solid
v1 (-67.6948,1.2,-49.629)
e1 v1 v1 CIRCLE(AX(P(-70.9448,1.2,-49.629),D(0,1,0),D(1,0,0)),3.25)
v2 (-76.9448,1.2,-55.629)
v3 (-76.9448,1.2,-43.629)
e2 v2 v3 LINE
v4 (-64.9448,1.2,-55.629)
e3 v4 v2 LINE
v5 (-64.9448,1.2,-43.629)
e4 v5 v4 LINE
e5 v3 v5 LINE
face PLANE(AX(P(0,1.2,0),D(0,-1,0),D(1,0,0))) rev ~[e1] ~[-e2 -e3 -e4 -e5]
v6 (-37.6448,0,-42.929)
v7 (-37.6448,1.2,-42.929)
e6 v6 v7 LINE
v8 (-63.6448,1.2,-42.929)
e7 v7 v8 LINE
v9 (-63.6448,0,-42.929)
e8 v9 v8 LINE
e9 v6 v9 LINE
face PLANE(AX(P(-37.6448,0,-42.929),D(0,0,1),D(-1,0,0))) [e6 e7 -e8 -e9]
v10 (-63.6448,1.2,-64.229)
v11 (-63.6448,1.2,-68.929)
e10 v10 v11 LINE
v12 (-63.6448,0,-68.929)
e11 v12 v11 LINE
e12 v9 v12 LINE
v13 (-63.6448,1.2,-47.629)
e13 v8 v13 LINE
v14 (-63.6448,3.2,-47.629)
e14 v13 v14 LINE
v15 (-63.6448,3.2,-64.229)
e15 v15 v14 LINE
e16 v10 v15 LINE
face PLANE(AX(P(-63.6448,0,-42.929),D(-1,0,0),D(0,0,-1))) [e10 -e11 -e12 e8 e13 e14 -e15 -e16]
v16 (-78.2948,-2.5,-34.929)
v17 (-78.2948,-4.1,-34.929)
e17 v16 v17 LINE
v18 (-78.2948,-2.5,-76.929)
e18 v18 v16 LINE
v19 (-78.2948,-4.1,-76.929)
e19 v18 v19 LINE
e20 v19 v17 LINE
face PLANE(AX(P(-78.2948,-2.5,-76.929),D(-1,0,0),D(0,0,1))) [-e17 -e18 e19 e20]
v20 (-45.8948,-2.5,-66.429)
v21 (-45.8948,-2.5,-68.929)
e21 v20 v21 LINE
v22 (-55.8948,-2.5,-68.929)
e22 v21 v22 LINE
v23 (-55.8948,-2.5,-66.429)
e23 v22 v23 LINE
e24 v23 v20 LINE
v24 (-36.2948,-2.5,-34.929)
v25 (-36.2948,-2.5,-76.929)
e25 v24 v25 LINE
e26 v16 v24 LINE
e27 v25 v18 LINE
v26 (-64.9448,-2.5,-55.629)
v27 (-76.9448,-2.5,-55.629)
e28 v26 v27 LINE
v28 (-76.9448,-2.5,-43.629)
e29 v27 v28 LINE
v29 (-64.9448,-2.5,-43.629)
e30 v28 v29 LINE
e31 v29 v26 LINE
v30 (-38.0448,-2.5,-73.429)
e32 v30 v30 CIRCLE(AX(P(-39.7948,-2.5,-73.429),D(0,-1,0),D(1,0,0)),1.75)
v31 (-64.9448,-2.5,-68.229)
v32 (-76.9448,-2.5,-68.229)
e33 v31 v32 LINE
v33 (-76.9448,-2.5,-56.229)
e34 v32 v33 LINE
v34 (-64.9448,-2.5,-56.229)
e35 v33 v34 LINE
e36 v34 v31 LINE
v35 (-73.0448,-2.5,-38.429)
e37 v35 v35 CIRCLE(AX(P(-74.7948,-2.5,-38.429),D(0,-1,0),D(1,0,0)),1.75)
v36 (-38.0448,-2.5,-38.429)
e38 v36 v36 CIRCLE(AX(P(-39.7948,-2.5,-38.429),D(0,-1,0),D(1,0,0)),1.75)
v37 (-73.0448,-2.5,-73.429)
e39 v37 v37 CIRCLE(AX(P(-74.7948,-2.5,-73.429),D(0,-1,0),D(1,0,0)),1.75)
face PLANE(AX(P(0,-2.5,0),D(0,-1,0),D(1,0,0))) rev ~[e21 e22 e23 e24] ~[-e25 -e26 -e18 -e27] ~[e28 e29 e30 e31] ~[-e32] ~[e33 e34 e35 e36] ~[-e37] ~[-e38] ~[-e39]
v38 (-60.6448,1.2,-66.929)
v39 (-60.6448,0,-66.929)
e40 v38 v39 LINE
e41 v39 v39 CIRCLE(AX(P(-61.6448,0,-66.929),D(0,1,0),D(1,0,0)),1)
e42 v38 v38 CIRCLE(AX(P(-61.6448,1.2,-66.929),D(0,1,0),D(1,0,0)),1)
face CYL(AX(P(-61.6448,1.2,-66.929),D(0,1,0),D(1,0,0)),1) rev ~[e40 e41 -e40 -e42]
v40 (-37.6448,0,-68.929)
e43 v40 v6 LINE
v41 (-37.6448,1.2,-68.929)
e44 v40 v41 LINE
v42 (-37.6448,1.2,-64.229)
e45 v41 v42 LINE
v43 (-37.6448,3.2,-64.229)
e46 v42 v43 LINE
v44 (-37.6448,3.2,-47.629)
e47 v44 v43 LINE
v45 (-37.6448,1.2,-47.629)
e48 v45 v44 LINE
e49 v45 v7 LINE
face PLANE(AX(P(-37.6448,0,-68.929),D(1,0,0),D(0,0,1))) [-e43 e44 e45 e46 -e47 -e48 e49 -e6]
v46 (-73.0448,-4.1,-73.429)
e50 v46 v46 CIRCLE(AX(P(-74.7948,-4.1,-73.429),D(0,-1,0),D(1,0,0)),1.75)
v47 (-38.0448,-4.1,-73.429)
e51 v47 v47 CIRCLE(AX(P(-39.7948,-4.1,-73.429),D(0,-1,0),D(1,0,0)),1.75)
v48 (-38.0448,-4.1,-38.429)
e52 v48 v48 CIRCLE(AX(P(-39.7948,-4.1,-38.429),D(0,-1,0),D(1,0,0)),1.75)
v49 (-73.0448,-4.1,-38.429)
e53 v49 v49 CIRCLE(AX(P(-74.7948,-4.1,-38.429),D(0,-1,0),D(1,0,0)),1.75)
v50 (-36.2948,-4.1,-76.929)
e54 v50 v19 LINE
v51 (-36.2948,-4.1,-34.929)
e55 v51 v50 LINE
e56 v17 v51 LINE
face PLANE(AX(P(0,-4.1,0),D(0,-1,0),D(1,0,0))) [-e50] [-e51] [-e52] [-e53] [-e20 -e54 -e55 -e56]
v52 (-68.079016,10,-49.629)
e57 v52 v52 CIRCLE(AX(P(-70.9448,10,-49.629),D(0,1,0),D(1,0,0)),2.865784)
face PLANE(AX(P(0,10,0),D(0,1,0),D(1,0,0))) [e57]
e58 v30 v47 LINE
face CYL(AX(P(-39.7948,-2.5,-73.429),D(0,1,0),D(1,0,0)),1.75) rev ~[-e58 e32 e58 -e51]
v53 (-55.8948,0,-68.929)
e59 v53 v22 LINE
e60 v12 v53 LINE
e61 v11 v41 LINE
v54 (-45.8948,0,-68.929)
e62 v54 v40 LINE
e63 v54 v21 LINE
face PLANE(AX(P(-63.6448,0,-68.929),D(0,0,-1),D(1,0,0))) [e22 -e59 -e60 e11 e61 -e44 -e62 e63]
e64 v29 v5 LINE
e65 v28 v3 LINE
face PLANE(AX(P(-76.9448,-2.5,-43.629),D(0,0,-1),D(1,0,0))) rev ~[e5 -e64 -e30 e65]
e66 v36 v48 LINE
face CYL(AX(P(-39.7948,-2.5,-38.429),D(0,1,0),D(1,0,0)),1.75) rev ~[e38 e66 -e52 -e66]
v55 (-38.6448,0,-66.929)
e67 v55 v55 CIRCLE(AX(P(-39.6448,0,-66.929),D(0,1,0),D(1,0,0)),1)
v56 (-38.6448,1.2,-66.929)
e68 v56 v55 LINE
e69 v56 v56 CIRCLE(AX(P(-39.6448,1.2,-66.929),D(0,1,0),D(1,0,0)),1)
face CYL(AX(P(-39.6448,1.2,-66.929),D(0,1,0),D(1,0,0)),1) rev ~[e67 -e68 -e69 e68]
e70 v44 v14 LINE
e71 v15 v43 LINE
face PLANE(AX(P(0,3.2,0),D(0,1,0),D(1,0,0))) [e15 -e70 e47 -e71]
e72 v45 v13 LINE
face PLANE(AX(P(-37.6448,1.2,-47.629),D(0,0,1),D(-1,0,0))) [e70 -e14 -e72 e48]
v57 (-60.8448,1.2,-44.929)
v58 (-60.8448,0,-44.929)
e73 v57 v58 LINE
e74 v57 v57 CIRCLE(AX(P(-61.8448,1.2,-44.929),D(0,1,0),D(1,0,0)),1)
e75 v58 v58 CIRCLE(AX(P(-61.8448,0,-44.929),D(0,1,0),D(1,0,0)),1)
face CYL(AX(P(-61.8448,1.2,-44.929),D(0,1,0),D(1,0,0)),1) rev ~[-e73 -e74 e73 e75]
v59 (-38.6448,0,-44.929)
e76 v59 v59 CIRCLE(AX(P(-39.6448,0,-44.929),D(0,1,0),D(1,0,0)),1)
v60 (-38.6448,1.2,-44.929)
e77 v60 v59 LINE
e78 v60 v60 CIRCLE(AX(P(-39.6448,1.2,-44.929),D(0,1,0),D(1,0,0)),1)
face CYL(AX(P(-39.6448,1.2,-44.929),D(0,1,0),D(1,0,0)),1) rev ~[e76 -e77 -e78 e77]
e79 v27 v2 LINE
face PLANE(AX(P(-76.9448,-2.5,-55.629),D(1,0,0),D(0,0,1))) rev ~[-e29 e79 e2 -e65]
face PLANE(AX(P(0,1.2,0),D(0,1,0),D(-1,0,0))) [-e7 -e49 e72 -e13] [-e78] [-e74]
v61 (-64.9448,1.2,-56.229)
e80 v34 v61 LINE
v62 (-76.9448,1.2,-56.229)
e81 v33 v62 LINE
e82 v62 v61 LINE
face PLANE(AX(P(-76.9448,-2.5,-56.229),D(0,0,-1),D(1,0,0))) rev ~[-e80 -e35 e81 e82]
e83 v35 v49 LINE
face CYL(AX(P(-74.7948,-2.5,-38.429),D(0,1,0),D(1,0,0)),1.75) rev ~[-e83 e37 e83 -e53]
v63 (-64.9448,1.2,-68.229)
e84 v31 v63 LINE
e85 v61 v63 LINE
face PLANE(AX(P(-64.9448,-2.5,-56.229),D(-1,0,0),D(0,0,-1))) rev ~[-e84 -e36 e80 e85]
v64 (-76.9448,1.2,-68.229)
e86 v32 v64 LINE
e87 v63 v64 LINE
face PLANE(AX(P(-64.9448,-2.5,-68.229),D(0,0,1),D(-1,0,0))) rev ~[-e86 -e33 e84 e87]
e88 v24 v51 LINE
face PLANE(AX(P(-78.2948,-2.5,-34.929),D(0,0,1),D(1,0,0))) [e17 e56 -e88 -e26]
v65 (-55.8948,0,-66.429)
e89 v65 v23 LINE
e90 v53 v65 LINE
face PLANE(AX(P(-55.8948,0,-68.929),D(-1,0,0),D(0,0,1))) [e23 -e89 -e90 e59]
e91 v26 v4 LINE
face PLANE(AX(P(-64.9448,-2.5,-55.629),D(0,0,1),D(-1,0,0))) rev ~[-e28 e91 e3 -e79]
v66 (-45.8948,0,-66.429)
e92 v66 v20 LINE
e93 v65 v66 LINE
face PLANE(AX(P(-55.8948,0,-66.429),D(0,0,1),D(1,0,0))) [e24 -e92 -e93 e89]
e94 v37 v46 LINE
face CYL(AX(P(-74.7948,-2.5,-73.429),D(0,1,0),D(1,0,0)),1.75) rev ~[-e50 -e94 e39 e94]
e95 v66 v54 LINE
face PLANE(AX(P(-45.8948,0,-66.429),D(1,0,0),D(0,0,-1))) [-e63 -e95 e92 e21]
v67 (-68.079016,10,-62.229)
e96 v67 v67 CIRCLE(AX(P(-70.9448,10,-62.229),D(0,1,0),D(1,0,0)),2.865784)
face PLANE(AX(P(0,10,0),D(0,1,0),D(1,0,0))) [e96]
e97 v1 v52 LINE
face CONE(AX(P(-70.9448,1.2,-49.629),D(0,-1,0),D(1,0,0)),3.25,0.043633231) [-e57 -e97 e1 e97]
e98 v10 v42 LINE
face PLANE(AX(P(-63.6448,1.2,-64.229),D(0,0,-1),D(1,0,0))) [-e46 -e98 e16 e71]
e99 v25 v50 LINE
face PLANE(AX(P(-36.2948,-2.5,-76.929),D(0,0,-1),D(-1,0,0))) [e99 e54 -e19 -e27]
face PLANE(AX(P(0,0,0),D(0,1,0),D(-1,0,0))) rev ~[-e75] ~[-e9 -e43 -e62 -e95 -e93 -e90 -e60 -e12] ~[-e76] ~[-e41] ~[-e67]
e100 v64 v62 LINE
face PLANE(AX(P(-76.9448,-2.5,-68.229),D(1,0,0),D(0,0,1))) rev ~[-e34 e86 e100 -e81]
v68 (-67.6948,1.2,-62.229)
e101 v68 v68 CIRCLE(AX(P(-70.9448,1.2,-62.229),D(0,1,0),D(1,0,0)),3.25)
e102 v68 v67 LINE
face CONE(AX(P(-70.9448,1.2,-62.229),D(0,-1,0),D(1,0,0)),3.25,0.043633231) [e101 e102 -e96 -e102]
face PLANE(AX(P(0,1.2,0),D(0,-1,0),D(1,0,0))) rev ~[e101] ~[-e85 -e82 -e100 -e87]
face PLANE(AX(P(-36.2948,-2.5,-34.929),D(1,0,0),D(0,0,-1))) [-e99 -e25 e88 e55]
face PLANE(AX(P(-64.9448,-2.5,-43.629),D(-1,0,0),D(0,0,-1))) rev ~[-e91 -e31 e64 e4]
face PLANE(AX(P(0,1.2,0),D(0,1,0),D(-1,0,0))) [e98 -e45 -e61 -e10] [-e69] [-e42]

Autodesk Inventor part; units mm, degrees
ref_plane "YZ Plane" through (0, 0, 0) normal (1, 0, 0) x (0, 1, 0)
ref_plane "XZ Plane" through (0, 0, 0) normal (0, 1, 0) x (-1, 0, 0)
ref_plane "XY Plane" through (0, 0, 0) normal (0, 0, 1) x (1, 0, 0)
sketch "Sketch1" plane through (0, 0, 0) normal (0, 1, 0) x (-1, 0, 0)
  line L0 (63.6448, -68.929) -> (37.6448, -68.929)
  line L1 (37.6448, -68.929) -> (37.6448, -42.929)
  line L2 (37.6448, -42.929) -> (63.6448, -42.929)
  line L3 (63.6448, -42.929) -> (63.6448, -68.929)
  point P0 (0, 0)
  dimension "d0" = 26
  dimension "d1" = 26
extrude "Extrusion1" add sketch "Sketch1" along normal blind 1.2
sketch "Sketch2" plane through (0, 1.2, 0) normal (0, 1, 0) x (1, 0, 0)
  line L0 (-63.6448, 68.929) -> (-63.6448, 42.929) projected
  line L1 (-37.6448, 42.929) -> (-37.6448, 68.929) projected
  line L2 (-63.6448, 64.229) -> (-37.6448, 64.229)
  line L3 (-37.6448, 64.229) -> (-37.6448, 47.629)
  line L4 (-37.6448, 47.629) -> (-63.6448, 47.629)
  line L5 (-63.6448, 47.629) -> (-63.6448, 64.229)
  line L6 (-37.6448, 68.929) -> (-63.6448, 68.929) projected
  point P0 (0, 0)
  point P1 (-63.6448, 47.629)
  dimension "d4" = 4.7
  dimension "d5" = 16.6
extrude "Extrusion2" add sketch "Sketch2" along normal blind 2 contours L2 L1 L4 L0
sketch "Sketch3" plane through (0, 1.2, 0) normal (0, 1, 0) x (1, 0, 0)
  circle A0 centre (-61.6448, 66.929) radius 1
  circle A1 centre (-39.6448, 66.929) radius 1
  circle A2 centre (-39.6448, 44.929) radius 1
  circle A3 centre (-61.8448, 44.929) radius 1
  line L0 (-63.6448, 68.929) -> (-63.6448, 64.229) projected
  line L1 (-37.6448, 68.929) -> (-63.6448, 68.929) projected
  line L2 (-37.6448, 64.229) -> (-37.6448, 68.929) projected
  line L3 (-37.6448, 42.929) -> (-37.6448, 47.629) projected
  line L4 (-63.6448, 42.929) -> (-37.6448, 42.929) projected
  line L5 (-63.6448, 47.629) -> (-63.6448, 42.929) projected
  point P0 (0, 0)
  point P1 (-63.6448, 45.279)
  dimension "d8" = 2
  dimension "d9" = 2
  dimension "d10" = 2
  dimension "d11" = 2
  dimension "d12" = 2
  dimension "d13" = 2
  dimension "d14" = 2
  dimension "d15" = 2
  dimension "d16" = 2
  dimension "d17" = 2
  dimension "d18" = 2
  dimension "d19" = 1.8
extrude "Extrusion3" cut sketch "Sketch3" against normal through all
sketch "Sketch4" plane through (0, 0, 0) normal (0, -1, 0) x (1, 0, 0)
  line L0 (-45.8948, -68.929) -> (-55.8948, -68.929)
  line L1 (-55.8948, -68.929) -> (-55.8948, -66.429)
  line L2 (-55.8948, -66.429) -> (-45.8948, -66.429)
  line L3 (-45.8948, -66.429) -> (-45.8948, -68.929)
  line L4 (-37.6448, -68.929) -> (-63.6448, -68.929) projected
  line L5 (-37.6448, -42.929) -> (-37.6448, -68.929) projected
  point P0 (0, 0)
  dimension "d22" = 10
  dimension "d23" = 2.5
  dimension "d24" = 0
  dimension "d25" = 8.25
extrude "Extrusion4" add sketch "Sketch4" along normal blind 2.5
sketch "Sketch5" plane through (0, -2.5, 0) normal (0, -1, 0) x (1, 0, 0)
  line L0 (-64.9448, -68.229) -> (-76.9448, -68.229)
  line L1 (-76.9448, -68.229) -> (-76.9448, -56.229)
  line L2 (-76.9448, -56.229) -> (-64.9448, -56.229)
  line L3 (-64.9448, -56.229) -> (-64.9448, -68.229)
  line L4 (-64.9448, -55.629) -> (-76.9448, -55.629)
  line L5 (-76.9448, -55.629) -> (-76.9448, -43.629)
  line L6 (-76.9448, -43.629) -> (-64.9448, -43.629)
  line L7 (-64.9448, -43.629) -> (-64.9448, -55.629)
  line L8 (-55.8948, -68.929) -> (-63.6448, -68.929) projected
  line L9 (-63.6448, -68.929) -> (-63.6448, -42.929) projected
  line L10 (-63.6448, -42.929) -> (-37.6448, -42.929) projected
  point P0 (0, 0)
  dimension "d28" = 12
  dimension "d29" = 12
  dimension "d30" = 12
  dimension "d31" = 12
  dimension "d32" = 0.7
  dimension "d33" = 1.3
  dimension "d34" = 0.7
extrude "Extrusion5" add sketch "Sketch5" against normal blind 3.7
sketch "Sketch7" plane through (0, 1.2, 0) normal (0, 1, 0) x (1, 0, 0)
  circle A0 centre (-70.9448, 62.229) radius 3.25
  circle A1 centre (-70.9448, 49.629) radius 3.25
  line L0 (-64.9448, 68.229) -> (-76.9448, 68.229) projected
  line L1 (-76.9448, 68.229) -> (-76.9448, 43.629) projected
  line L2 (-64.9448, 55.629) -> (-76.9448, 55.629) projected
  line L3 (-76.9448, 55.629) -> (-76.9448, 43.629) projected
  point P0 (0, 0)
  point P1 (-76.9448, 56.229)
  dimension "d47" = 6.5
  dimension "d48" = 6.5
  dimension "d49" = 6
  dimension "d50" = 6
  dimension "d51" = 6
  dimension "d52" = 6
extrude "Extrusion7" add sketch "Sketch7" along normal blind 8.8
draft "FaceDraft3" angle 2.5 pull direction (0, 1, 0) faces at (-67.7053, 7.0667, -61.9675) fixed edges at (-74.1948, 1.2, -62.229)
draft "FaceDraft4" angle 2.5 pull direction (0, 1, 0) faces at (-67.7053, 7.0667, -49.3675) fixed edges at (-74.1948, 1.2, -49.629)
sketch "Sketch8" plane through (0, -2.5, 0) normal (0, -1, 0) x (1, 0, 0)
  line L0 (-78.2948, -34.929) -> (-36.2948, -34.929)
  line L1 (-36.2948, -34.929) -> (-36.2948, -76.929)
  line L2 (-36.2948, -76.929) -> (-78.2948, -76.929)
  line L3 (-78.2948, -76.929) -> (-78.2948, -34.929)
  line L4 (-63.6448, -42.929) -> (-37.6448, -42.929) projected
  line L5 (-37.6448, -42.929) -> (-37.6448, -68.929) projected
  circle A0 centre (-74.7948, -73.429) radius 1.75
  circle A1 centre (-39.7948, -73.429) radius 1.75
  circle A2 centre (-74.7948, -38.429) radius 1.75
  circle A3 centre (-39.7948, -38.429) radius 1.75
  line L6 (-37.6448, -47.629) -> (-37.6448, -64.229) projected
  point P0 (0, 0)
  point P1 (-37.6448, -55.929)
  dimension "d57" = 42
  dimension "d58" = 42
  dimension "d59" = 8
  dimension "d63" = 3.5
  dimension "d64" = 3.5
  dimension "d65" = 3.5
  dimension "d66" = 3.5
  dimension "d67" = 3.5
  dimension "d68" = 3.5
  dimension "d69" = 3.5
  dimension "d70" = 3.5
  dimension "d71" = 3.5
  dimension "d72" = 3.5
  dimension "d73" = 3.5
  dimension "d74" = 3.5
  dimension "d75" = 1.35
extrude "Extrusion8" add sketch "Sketch8" along normal blind 1.6
equation "\"d14\" = d13"
equation "\"d15\" = d14"
equation "\"d16\" = d14"
equation "\"d17\" = d15"
equation "\"d18\" = d12"
equation "\"d51\" = d49"
equation "\"d52\" = d50"
equation "\"d64\" = d63"
equation "\"d65\" = d63"
equation "\"d66\" = d63"
equation "\"d68\" = d67"
equation "\"d69\" = d68"
equation "\"d70\" = d68"
equation "\"d71\" = d69"
equation "\"d72\" = d70"
equation "\"d73\" = d67"
equation "\"d74\" = d68"
properties part number "display_buttons"
